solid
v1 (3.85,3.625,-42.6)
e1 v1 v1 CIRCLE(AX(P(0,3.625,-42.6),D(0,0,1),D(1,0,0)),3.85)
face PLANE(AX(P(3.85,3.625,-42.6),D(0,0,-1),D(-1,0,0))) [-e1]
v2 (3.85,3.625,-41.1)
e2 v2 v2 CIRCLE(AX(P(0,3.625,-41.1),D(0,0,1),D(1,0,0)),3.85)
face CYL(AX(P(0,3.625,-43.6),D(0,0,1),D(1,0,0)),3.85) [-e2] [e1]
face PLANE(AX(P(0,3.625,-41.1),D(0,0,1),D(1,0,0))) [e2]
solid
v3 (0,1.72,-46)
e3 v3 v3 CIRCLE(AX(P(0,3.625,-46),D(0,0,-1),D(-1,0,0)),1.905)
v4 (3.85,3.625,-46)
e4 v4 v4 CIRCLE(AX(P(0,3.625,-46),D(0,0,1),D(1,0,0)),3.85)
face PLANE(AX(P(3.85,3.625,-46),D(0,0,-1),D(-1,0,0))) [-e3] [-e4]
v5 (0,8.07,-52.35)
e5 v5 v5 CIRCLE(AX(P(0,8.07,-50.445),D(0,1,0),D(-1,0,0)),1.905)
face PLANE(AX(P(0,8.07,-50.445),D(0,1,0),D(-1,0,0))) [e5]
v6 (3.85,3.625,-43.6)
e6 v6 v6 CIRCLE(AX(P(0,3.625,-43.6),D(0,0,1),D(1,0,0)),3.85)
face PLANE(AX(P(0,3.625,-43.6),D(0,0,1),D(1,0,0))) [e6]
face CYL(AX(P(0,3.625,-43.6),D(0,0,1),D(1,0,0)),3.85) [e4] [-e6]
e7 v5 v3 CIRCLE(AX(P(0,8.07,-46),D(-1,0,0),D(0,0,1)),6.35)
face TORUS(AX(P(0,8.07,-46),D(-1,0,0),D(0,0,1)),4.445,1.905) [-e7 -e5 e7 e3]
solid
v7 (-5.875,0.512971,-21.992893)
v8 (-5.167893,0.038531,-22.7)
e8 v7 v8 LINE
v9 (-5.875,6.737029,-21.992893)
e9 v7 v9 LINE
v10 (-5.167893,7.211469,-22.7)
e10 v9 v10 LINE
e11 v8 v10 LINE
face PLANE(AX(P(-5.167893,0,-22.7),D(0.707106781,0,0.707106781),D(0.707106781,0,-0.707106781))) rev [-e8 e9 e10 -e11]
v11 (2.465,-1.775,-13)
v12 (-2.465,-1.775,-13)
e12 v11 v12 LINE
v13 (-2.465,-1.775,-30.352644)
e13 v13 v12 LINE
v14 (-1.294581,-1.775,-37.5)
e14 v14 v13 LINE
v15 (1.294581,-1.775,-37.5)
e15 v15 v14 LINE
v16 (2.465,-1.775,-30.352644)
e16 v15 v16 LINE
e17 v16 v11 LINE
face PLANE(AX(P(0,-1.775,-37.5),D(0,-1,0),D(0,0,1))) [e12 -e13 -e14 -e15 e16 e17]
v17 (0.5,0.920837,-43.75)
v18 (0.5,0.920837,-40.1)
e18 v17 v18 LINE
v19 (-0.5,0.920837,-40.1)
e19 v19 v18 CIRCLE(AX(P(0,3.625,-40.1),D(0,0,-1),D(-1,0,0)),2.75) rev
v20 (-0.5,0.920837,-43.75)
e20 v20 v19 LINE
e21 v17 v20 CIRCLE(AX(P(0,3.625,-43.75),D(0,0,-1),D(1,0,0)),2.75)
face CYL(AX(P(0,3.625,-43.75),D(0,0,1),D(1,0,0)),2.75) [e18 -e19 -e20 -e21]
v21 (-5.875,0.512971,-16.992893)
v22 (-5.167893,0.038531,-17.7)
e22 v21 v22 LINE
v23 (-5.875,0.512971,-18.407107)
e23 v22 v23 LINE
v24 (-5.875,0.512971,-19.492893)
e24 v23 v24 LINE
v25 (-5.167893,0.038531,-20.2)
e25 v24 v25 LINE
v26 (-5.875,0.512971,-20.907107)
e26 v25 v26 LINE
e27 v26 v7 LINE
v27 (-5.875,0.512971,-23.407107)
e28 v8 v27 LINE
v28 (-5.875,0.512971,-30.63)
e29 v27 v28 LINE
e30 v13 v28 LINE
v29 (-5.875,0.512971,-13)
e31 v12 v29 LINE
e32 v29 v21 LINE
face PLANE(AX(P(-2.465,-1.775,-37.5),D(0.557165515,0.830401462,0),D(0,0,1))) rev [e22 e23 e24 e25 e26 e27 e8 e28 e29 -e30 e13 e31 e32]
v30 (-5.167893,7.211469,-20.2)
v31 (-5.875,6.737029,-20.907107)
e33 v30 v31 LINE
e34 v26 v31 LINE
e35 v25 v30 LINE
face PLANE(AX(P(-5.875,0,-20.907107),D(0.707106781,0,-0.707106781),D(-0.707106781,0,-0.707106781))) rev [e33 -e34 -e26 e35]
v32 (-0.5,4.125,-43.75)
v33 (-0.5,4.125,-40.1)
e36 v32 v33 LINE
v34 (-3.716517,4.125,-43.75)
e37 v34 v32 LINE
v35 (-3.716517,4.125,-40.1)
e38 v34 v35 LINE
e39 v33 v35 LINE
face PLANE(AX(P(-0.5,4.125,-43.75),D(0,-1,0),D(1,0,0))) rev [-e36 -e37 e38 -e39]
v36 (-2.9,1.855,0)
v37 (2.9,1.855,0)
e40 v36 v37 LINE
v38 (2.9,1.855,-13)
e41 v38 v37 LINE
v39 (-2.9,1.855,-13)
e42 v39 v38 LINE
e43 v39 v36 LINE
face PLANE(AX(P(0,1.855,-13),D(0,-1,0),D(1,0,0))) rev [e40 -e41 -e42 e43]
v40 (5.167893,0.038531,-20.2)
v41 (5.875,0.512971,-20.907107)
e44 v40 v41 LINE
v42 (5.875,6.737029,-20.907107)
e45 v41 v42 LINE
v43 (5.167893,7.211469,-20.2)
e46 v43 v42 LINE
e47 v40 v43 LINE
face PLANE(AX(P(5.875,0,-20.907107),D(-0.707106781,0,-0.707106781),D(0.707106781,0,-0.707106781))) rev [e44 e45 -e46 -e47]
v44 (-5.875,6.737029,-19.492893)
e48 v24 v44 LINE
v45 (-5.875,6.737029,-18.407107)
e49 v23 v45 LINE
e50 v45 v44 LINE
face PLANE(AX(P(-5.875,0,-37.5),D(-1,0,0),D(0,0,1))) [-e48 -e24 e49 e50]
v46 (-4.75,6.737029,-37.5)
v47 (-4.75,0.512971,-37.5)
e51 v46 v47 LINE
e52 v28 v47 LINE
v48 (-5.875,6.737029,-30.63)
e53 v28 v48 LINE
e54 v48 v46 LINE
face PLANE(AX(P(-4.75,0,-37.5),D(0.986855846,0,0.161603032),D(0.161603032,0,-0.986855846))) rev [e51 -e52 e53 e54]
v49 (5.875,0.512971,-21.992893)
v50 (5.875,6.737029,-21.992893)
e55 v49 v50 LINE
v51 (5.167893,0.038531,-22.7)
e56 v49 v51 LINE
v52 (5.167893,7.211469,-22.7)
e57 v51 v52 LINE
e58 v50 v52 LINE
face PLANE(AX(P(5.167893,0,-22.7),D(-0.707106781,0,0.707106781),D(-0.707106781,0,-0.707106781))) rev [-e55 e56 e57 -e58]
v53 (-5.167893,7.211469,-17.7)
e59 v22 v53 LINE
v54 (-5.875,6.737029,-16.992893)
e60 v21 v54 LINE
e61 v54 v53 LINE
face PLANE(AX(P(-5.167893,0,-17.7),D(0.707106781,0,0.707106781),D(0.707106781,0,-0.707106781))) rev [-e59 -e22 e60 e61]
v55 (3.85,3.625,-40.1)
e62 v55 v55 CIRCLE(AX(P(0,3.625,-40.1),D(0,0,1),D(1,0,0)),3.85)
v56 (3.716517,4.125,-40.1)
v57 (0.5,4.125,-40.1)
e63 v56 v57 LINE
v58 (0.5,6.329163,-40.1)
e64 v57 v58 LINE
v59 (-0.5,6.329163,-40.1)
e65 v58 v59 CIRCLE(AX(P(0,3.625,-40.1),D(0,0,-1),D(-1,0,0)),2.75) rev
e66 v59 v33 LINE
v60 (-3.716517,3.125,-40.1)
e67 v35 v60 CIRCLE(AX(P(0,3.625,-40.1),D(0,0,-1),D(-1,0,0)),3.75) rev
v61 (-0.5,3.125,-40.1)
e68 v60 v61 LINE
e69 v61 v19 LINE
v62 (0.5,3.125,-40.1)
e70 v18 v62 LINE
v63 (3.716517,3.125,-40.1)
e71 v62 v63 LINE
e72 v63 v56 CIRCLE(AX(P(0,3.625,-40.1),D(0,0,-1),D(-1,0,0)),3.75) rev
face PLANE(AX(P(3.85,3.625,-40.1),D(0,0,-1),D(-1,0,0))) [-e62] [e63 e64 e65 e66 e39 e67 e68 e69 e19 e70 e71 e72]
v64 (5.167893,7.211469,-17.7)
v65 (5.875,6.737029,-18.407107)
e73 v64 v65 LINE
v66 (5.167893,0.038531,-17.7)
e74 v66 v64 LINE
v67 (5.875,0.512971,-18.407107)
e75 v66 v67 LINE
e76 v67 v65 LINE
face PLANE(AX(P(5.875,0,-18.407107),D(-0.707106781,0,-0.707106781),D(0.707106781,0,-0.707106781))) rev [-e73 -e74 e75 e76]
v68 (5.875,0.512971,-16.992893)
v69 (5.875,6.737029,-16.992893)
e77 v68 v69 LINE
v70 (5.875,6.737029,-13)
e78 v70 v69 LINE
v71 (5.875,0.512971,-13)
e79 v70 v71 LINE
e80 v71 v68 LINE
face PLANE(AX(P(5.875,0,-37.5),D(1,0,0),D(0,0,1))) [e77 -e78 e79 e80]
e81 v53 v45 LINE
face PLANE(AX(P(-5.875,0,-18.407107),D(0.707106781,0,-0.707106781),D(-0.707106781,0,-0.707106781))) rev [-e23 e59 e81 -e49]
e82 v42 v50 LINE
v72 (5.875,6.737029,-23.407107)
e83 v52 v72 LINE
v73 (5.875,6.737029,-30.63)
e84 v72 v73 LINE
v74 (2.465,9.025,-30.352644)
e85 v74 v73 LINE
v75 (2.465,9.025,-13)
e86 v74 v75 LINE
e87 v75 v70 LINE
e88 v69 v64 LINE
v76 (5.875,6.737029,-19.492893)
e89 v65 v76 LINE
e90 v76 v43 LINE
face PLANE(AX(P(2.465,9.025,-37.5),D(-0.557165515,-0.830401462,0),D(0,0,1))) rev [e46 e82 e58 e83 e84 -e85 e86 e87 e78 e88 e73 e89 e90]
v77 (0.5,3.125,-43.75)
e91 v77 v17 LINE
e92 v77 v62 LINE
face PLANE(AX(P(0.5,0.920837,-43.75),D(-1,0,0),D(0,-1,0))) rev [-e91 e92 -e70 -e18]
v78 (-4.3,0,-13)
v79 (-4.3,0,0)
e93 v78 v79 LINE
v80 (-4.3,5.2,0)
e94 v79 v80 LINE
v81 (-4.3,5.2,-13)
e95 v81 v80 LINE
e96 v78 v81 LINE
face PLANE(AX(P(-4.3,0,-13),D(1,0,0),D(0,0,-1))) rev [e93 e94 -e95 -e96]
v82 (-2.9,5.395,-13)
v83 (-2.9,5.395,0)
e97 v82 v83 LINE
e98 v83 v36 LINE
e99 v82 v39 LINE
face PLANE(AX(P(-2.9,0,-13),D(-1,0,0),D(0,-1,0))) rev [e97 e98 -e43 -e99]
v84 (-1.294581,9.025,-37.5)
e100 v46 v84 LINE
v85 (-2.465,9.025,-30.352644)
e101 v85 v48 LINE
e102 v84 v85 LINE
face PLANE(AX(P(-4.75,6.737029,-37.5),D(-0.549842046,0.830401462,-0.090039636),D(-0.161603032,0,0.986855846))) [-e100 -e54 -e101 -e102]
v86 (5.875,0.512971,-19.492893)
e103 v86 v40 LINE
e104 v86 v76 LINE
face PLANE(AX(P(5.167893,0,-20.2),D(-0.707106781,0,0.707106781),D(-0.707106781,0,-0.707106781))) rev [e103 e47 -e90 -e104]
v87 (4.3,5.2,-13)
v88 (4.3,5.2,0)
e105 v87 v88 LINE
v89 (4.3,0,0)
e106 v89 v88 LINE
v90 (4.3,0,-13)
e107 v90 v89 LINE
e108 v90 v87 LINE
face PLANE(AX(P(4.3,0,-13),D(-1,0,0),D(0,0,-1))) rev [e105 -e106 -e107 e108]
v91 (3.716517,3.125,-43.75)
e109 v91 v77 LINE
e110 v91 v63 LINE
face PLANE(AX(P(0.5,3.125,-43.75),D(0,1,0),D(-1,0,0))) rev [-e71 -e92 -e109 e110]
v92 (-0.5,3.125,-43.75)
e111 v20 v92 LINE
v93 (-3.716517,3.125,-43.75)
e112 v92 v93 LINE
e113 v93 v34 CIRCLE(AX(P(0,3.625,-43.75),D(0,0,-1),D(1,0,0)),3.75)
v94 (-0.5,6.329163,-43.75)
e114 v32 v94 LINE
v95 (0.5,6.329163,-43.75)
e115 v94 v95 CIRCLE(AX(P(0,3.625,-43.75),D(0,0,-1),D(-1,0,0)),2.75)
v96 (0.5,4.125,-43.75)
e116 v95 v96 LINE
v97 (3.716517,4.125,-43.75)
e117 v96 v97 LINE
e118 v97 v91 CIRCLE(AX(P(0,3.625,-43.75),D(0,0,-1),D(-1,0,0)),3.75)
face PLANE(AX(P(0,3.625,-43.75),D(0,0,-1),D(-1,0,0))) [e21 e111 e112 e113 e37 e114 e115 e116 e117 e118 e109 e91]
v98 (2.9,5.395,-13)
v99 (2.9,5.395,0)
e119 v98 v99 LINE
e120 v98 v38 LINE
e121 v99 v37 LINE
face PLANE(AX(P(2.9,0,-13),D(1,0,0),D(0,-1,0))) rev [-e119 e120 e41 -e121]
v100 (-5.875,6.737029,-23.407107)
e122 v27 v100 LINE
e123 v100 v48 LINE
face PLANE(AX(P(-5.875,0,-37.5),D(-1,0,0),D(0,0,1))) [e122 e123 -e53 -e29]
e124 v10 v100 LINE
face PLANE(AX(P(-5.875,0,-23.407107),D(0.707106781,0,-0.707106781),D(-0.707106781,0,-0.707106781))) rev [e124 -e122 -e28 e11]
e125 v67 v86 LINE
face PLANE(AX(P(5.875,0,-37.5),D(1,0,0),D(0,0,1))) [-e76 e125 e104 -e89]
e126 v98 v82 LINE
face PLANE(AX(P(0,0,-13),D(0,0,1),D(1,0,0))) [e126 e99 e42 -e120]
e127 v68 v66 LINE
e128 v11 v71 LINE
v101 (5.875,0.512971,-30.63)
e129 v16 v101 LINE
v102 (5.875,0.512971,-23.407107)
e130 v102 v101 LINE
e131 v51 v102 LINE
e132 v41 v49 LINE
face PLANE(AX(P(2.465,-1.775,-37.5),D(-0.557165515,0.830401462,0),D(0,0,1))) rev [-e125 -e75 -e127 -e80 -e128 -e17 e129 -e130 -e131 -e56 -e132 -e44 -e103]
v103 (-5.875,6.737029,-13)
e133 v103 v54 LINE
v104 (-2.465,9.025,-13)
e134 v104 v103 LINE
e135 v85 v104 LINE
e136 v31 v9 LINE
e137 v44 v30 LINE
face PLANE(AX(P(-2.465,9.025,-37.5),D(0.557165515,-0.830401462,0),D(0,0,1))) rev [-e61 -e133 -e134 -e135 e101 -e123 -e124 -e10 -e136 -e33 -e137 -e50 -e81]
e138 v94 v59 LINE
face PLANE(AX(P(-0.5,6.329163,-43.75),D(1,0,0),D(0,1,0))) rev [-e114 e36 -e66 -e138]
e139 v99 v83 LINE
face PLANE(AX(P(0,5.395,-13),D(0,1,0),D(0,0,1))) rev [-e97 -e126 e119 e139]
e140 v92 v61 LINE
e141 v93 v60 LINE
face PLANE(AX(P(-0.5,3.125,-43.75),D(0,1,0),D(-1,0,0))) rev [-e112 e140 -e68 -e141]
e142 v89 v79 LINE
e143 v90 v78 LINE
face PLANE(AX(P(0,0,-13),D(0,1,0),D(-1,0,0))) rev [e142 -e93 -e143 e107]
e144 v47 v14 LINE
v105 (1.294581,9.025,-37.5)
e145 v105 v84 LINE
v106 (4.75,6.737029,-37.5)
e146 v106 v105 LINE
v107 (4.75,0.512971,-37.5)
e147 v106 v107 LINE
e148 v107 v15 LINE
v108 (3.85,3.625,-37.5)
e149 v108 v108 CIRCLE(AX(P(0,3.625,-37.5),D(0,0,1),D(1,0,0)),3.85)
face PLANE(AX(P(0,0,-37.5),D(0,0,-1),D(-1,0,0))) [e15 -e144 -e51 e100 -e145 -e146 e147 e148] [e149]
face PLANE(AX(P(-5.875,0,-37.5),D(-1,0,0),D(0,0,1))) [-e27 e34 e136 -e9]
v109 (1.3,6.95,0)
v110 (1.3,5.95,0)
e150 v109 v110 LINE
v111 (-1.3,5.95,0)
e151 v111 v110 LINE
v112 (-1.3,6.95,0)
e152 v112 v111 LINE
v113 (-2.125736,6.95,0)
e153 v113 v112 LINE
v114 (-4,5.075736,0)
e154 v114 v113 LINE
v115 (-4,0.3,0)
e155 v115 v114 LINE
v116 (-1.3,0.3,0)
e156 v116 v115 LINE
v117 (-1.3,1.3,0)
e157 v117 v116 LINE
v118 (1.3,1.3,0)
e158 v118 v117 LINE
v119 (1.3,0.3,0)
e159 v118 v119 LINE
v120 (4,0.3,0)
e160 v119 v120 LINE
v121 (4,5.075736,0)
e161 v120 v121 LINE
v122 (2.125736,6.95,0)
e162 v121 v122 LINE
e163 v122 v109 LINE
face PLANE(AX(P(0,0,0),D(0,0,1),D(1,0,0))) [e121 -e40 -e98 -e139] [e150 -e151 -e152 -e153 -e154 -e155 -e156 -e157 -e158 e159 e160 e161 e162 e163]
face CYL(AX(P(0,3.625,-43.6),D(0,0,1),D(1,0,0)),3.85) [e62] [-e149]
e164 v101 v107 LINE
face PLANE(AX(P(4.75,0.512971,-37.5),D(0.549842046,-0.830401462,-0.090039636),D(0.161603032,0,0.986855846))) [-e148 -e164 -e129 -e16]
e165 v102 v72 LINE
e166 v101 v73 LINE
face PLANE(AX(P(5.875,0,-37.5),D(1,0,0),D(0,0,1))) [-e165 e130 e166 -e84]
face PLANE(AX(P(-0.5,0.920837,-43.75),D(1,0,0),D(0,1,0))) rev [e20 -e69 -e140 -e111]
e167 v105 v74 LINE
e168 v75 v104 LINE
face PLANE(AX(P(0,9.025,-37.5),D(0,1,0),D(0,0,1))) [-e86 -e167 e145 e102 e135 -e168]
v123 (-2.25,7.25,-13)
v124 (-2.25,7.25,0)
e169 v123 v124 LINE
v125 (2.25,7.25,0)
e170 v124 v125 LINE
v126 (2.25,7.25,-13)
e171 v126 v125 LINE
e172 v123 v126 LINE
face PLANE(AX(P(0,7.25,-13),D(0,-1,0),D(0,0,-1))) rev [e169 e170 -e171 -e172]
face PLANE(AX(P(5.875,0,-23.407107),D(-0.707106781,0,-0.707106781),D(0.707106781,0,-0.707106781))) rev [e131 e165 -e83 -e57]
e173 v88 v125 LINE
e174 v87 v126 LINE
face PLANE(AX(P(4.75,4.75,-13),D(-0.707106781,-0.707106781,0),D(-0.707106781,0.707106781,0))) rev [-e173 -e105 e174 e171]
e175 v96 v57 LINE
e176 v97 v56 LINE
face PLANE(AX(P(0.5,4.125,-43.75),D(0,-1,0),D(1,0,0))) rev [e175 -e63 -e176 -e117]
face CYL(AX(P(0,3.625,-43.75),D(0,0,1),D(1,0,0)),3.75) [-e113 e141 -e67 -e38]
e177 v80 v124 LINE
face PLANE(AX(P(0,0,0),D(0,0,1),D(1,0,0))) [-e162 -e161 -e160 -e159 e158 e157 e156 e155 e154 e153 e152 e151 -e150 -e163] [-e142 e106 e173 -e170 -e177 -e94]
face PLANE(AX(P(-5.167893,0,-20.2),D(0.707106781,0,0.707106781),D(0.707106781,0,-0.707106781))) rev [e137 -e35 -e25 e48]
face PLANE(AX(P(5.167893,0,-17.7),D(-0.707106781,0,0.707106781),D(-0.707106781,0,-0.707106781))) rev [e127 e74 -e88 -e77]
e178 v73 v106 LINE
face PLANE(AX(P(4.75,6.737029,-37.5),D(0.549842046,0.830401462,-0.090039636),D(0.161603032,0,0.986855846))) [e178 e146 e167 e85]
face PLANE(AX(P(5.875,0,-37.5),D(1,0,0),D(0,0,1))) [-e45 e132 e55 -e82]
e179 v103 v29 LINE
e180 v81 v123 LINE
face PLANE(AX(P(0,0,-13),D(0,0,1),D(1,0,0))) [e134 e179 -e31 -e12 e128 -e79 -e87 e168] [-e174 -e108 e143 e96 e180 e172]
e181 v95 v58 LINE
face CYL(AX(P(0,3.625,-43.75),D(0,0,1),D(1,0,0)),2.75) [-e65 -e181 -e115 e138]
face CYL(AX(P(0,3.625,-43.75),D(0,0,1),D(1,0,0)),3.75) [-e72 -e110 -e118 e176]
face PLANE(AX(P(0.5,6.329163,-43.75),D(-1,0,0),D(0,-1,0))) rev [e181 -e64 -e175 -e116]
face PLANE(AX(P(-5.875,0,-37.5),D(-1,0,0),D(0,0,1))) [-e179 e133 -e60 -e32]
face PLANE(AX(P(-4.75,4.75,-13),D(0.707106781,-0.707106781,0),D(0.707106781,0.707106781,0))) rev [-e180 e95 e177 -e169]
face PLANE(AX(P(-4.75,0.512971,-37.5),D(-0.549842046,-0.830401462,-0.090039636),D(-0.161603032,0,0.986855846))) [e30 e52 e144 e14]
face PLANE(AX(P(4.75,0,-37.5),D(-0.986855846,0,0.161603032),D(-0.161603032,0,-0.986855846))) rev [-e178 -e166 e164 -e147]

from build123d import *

# Parameters (mm, degrees)
SKETCH1_W           = 1.3
SKETCH1_H           = 0.555
BOSS_EXTRUDE1_DEPTH = 13
SKETCH3_W           = 2.9
SKETCH3_H           = 1.77
BOSS_EXTRUDE2_DEPTH = 24.5
CUT_EXTRUDE1_DEPTH  = 40.015589833
CHAMFER1_SIZE       = 3.41
CHAMFER1_SIZE_2     = 2.287970931
SKETCH7_W           = 3.85
SKETCH7_H           = 2.6
SKETCH7_H_2         = 1.5
SKETCH7_H_3         = 2.4
BOSS_EXTRUDE3_DEPTH = 6.25
SKETCH8_R           = 1.905
REVOLVE2_ANGLE      = 90


with BuildPart() as part:
    # Sketch1 → Boss-Extrude1 (new body)
    with BuildSketch(Plane.XY):
        Polygon((-1.3, 0.3), (-1.3, 1.3), (-1.3, 1.855), (-2.9, 1.855), (-2.9, 5.395), (-1.3, 5.395), (-1.3, 5.95), (-1.3, 6.95), (-2.125735931, 6.95), (-4, 5.075735931), (-4, 0.3), align=None)
        with Locations((-0.65, 1.5775)):
            Rectangle(SKETCH1_W, SKETCH1_H)
        Polygon((-4.3, 0), (0, 0), (0, 1.3), (-1.3, 1.3), (-1.3, 0.3), (-4, 0.3), (-4, 5.075735931), (-2.125735931, 6.95), (-1.3, 6.95), (-1.3, 5.95), (0, 5.95), (0, 7.25), (-2.25, 7.25), (-4.3, 5.2), align=None)
        with Locations((-0.65, 5.6725)):
            Rectangle(SKETCH1_W, SKETCH1_H)
    extrude(amount=-BOSS_EXTRUDE1_DEPTH)

    # Mirror1: part across plane


with BuildPart() as part_1:
    add(part.part)
    add(part.part.mirror(Plane(origin=(0, 0, -13), x_dir=(0, 0, 1), z_dir=(-1, 0, 0))))

    # Sketch3 → Boss-Extrude2 (add)
    with BuildSketch(Plane(origin=(0, 0, -13), x_dir=(-1, 0, 0), z_dir=(0, 0, -1))):
        with Locations((1.45, 4.51)):
            Rectangle(SKETCH3_W, SKETCH3_H)
        Polygon((2.25, 7.25), (0, 7.25), (0, 5.395), (2.9, 5.395), (2.9, 3.625), (4.3, 3.625), (4.3, 5.2), align=None)
        Polygon((3.043750454, 9.025), (0, 9.025), (0, 7.25), (2.25, 7.25), (4.3, 5.2), (4.3, 3.625), (5.875, 3.625), (5.875, 7.125), (5.875, 9.025), align=None)
    extrude(amount=BOSS_EXTRUDE2_DEPTH)

    # Sketch4 → Cut-Extrude1 (cut, through all)
    with BuildSketch(Plane(origin=(0, 9.025, 0), x_dir=(1, 0, 0), z_dir=(0, 1, 0))):
        Polygon((-4.75, 37.5), (-5.875, 30.63), (-5.875, 37.5), align=None)
        Polygon((-5.875, 23.407106781), (-5.167893219, 22.7), (-5.875, 21.992893219), align=None)
        Polygon((-5.167893219, 20.2), (-5.875, 19.492893219), (-5.875, 20.907106781), align=None)
        Polygon((-5.167893219, 17.7), (-5.875, 16.992893219), (-5.875, 18.407106781), align=None)
    extrude(amount=-CUT_EXTRUDE1_DEPTH, mode=Mode.SUBTRACT)

    # Chamfer1
    # the kernel refuses this chamfer: 3.41, 2.287970931 mm, written as the material it takes off along each edge
    with BuildSketch(Plane(origin=(-5.875, 9.025, -4.189784247), x_dir=(0.9997674455612761, 0.021565129164482656, 0), z_dir=(0, 0, -1))) as chamfer1_piece_1:
        Polygon((CHAMFER1_SIZE * 0.999767445561, CHAMFER1_SIZE * 0.0215651291645), (-CHAMFER1_SIZE_2 * 0.0215651291646, CHAMFER1_SIZE_2 * 0.999767445568), (0, 0), align=None)
    extrude(amount=21.613324726, mode=Mode.SUBTRACT)
    with BuildSketch(Plane(origin=(-5.875, 9.025, -14.596891028), x_dir=(0.9997674455612761, 0.021565129164482656, 0), z_dir=(0, 0, -1))) as chamfer1_piece_2:
        Polygon((CHAMFER1_SIZE * 0.999767445561, CHAMFER1_SIZE * 0.0215651291645), (-CHAMFER1_SIZE_2 * 0.0215651291646, CHAMFER1_SIZE_2 * 0.999767445568), (0, 0), align=None)
    extrude(amount=24.843324726, mode=Mode.SUBTRACT)
    with BuildSketch(Plane(origin=(-3.326242426, 9.025, -46.194412918), x_dir=(0.986626348001283, 0.021565129164482656, 0.1615654500002101), z_dir=(-0.16160303150249725, 0, 0.9868558457085832))) as chamfer1_piece_3:
        Polygon((CHAMFER1_SIZE * 0.999767445561, -CHAMFER1_SIZE * 0.0215651291645), (-CHAMFER1_SIZE_2 * 0.0215651291646, -CHAMFER1_SIZE_2 * 0.999767445568), (0, 0), align=None)
    extrude(amount=24.581934577, mode=Mode.SUBTRACT)


with BuildPart() as body_2:
    # Split1: the piece on the far side of the plane
    add(part_1.part)
    split(bisect_by=Plane.XY.offset(-13), keep=Keep.BOTTOM)

    # Mirror9: body 2 across plane


with BuildPart() as part_2:
    add(part_1.part)

    # Split1
    split(bisect_by=Plane.XY.offset(-13), keep=Keep.TOP)


with BuildPart() as body_2_1:
    add(body_2.part)
    add(body_2.part.mirror(Plane(origin=(0, 0, -37.5), x_dir=(0, 0, 1), z_dir=(-1, 0, 0))))

    # Mirror10: body 2 across plane


with BuildPart() as body_2_2:
    add(body_2_1.part)
    add(body_2_1.part.mirror(Plane(origin=(0, 3.625, -37.5), x_dir=(0, 0, 1), z_dir=(0, 1, 0))))

    # Combine1: union part
    add(part_2.part)

    # Sketch7 → Revolve1 (revolve)
    with BuildSketch(Plane(origin=(0, 3.625, 0), x_dir=(1, 0, 0), z_dir=(0, 1, 0))):
        with Locations((1.925, 38.8)):
            Rectangle(SKETCH7_W, SKETCH7_H)
        with Locations((1.925, 41.85)):
            Rectangle(SKETCH7_W, SKETCH7_H_2)
        with Locations((1.925, 44.8)):
            Rectangle(SKETCH7_W, SKETCH7_H_3)
    revolve(axis=Axis((0, 3.625, -43.6), (0, 0, -1)))


with BuildPart() as revolve1_piece_1:
    # of the separate pieces the step leaves, piece 1, a body of its own (revolve1_pieces)
    add(body_2_2.part.solids().sort_by_distance((-5.875, 6.737029069, -13))[0])

    # Sketch5 → Boss-Extrude3 (add)
    with BuildSketch(Plane(origin=(0, 0, -37.5), x_dir=(-1, 0, 0), z_dir=(0, 0, -1))):
        with BuildLine():
            Line((-0.5, 6.329163457), (-0.5, 4.125))
            Line((-0.5, 4.125), (-3.716517187, 4.125))
            ThreePointArc((-3.716517187, 4.125), (-3.75, 3.625), (-3.716517187, 3.125))
            Line((-3.716517187, 3.125), (-0.5, 3.125))
            Line((-0.5, 3.125), (-0.5, 0.920836543))
            ThreePointArc((-0.5, 0.920836543), (0, 0.875), (0.5, 0.920836543))
            Line((0.5, 0.920836543), (0.5, 3.125))
            Line((0.5, 3.125), (3.716517187, 3.125))
            ThreePointArc((3.716517187, 3.125), (3.75, 3.625), (3.716517187, 4.125))
            Line((3.716517187, 4.125), (0.5, 4.125))
            Line((0.5, 4.125), (0.5, 6.329163457))
            ThreePointArc((0.5, 6.329163457), (0, 6.375), (-0.5, 6.329163457))
        make_face()
    extrude(amount=BOSS_EXTRUDE3_DEPTH)


with BuildPart() as revolve1_piece_2:
    # of the separate pieces the step leaves, piece 2, a body of its own (revolve1_pieces)
    add(body_2_2.part.solids().sort_by_distance((3.85, 3.625, -43.6))[0])

    # Sketch8 → Revolve2 (revolve)
    with BuildSketch(Plane(origin=(0, 0, -46), x_dir=(-1, 0, 0), z_dir=(0, 0, -1))):
        with Locations((0, 3.625)):
            Circle(SKETCH8_R)
    revolve(axis=Axis((4.502336245, 8.07, -46), (1, 0, 0)), revolution_arc=REVOLVE2_ANGLE)


with BuildPart() as revolve1_piece_3:
    # of the separate pieces the step leaves, piece 3, a body of its own (revolve1_pieces)
    add(body_2_2.part.solids().sort_by_distance((3.85, 3.625, -41.1))[0])


solid = Compound([revolve1_piece_1.part, revolve1_piece_2.part, revolve1_piece_3.part])
